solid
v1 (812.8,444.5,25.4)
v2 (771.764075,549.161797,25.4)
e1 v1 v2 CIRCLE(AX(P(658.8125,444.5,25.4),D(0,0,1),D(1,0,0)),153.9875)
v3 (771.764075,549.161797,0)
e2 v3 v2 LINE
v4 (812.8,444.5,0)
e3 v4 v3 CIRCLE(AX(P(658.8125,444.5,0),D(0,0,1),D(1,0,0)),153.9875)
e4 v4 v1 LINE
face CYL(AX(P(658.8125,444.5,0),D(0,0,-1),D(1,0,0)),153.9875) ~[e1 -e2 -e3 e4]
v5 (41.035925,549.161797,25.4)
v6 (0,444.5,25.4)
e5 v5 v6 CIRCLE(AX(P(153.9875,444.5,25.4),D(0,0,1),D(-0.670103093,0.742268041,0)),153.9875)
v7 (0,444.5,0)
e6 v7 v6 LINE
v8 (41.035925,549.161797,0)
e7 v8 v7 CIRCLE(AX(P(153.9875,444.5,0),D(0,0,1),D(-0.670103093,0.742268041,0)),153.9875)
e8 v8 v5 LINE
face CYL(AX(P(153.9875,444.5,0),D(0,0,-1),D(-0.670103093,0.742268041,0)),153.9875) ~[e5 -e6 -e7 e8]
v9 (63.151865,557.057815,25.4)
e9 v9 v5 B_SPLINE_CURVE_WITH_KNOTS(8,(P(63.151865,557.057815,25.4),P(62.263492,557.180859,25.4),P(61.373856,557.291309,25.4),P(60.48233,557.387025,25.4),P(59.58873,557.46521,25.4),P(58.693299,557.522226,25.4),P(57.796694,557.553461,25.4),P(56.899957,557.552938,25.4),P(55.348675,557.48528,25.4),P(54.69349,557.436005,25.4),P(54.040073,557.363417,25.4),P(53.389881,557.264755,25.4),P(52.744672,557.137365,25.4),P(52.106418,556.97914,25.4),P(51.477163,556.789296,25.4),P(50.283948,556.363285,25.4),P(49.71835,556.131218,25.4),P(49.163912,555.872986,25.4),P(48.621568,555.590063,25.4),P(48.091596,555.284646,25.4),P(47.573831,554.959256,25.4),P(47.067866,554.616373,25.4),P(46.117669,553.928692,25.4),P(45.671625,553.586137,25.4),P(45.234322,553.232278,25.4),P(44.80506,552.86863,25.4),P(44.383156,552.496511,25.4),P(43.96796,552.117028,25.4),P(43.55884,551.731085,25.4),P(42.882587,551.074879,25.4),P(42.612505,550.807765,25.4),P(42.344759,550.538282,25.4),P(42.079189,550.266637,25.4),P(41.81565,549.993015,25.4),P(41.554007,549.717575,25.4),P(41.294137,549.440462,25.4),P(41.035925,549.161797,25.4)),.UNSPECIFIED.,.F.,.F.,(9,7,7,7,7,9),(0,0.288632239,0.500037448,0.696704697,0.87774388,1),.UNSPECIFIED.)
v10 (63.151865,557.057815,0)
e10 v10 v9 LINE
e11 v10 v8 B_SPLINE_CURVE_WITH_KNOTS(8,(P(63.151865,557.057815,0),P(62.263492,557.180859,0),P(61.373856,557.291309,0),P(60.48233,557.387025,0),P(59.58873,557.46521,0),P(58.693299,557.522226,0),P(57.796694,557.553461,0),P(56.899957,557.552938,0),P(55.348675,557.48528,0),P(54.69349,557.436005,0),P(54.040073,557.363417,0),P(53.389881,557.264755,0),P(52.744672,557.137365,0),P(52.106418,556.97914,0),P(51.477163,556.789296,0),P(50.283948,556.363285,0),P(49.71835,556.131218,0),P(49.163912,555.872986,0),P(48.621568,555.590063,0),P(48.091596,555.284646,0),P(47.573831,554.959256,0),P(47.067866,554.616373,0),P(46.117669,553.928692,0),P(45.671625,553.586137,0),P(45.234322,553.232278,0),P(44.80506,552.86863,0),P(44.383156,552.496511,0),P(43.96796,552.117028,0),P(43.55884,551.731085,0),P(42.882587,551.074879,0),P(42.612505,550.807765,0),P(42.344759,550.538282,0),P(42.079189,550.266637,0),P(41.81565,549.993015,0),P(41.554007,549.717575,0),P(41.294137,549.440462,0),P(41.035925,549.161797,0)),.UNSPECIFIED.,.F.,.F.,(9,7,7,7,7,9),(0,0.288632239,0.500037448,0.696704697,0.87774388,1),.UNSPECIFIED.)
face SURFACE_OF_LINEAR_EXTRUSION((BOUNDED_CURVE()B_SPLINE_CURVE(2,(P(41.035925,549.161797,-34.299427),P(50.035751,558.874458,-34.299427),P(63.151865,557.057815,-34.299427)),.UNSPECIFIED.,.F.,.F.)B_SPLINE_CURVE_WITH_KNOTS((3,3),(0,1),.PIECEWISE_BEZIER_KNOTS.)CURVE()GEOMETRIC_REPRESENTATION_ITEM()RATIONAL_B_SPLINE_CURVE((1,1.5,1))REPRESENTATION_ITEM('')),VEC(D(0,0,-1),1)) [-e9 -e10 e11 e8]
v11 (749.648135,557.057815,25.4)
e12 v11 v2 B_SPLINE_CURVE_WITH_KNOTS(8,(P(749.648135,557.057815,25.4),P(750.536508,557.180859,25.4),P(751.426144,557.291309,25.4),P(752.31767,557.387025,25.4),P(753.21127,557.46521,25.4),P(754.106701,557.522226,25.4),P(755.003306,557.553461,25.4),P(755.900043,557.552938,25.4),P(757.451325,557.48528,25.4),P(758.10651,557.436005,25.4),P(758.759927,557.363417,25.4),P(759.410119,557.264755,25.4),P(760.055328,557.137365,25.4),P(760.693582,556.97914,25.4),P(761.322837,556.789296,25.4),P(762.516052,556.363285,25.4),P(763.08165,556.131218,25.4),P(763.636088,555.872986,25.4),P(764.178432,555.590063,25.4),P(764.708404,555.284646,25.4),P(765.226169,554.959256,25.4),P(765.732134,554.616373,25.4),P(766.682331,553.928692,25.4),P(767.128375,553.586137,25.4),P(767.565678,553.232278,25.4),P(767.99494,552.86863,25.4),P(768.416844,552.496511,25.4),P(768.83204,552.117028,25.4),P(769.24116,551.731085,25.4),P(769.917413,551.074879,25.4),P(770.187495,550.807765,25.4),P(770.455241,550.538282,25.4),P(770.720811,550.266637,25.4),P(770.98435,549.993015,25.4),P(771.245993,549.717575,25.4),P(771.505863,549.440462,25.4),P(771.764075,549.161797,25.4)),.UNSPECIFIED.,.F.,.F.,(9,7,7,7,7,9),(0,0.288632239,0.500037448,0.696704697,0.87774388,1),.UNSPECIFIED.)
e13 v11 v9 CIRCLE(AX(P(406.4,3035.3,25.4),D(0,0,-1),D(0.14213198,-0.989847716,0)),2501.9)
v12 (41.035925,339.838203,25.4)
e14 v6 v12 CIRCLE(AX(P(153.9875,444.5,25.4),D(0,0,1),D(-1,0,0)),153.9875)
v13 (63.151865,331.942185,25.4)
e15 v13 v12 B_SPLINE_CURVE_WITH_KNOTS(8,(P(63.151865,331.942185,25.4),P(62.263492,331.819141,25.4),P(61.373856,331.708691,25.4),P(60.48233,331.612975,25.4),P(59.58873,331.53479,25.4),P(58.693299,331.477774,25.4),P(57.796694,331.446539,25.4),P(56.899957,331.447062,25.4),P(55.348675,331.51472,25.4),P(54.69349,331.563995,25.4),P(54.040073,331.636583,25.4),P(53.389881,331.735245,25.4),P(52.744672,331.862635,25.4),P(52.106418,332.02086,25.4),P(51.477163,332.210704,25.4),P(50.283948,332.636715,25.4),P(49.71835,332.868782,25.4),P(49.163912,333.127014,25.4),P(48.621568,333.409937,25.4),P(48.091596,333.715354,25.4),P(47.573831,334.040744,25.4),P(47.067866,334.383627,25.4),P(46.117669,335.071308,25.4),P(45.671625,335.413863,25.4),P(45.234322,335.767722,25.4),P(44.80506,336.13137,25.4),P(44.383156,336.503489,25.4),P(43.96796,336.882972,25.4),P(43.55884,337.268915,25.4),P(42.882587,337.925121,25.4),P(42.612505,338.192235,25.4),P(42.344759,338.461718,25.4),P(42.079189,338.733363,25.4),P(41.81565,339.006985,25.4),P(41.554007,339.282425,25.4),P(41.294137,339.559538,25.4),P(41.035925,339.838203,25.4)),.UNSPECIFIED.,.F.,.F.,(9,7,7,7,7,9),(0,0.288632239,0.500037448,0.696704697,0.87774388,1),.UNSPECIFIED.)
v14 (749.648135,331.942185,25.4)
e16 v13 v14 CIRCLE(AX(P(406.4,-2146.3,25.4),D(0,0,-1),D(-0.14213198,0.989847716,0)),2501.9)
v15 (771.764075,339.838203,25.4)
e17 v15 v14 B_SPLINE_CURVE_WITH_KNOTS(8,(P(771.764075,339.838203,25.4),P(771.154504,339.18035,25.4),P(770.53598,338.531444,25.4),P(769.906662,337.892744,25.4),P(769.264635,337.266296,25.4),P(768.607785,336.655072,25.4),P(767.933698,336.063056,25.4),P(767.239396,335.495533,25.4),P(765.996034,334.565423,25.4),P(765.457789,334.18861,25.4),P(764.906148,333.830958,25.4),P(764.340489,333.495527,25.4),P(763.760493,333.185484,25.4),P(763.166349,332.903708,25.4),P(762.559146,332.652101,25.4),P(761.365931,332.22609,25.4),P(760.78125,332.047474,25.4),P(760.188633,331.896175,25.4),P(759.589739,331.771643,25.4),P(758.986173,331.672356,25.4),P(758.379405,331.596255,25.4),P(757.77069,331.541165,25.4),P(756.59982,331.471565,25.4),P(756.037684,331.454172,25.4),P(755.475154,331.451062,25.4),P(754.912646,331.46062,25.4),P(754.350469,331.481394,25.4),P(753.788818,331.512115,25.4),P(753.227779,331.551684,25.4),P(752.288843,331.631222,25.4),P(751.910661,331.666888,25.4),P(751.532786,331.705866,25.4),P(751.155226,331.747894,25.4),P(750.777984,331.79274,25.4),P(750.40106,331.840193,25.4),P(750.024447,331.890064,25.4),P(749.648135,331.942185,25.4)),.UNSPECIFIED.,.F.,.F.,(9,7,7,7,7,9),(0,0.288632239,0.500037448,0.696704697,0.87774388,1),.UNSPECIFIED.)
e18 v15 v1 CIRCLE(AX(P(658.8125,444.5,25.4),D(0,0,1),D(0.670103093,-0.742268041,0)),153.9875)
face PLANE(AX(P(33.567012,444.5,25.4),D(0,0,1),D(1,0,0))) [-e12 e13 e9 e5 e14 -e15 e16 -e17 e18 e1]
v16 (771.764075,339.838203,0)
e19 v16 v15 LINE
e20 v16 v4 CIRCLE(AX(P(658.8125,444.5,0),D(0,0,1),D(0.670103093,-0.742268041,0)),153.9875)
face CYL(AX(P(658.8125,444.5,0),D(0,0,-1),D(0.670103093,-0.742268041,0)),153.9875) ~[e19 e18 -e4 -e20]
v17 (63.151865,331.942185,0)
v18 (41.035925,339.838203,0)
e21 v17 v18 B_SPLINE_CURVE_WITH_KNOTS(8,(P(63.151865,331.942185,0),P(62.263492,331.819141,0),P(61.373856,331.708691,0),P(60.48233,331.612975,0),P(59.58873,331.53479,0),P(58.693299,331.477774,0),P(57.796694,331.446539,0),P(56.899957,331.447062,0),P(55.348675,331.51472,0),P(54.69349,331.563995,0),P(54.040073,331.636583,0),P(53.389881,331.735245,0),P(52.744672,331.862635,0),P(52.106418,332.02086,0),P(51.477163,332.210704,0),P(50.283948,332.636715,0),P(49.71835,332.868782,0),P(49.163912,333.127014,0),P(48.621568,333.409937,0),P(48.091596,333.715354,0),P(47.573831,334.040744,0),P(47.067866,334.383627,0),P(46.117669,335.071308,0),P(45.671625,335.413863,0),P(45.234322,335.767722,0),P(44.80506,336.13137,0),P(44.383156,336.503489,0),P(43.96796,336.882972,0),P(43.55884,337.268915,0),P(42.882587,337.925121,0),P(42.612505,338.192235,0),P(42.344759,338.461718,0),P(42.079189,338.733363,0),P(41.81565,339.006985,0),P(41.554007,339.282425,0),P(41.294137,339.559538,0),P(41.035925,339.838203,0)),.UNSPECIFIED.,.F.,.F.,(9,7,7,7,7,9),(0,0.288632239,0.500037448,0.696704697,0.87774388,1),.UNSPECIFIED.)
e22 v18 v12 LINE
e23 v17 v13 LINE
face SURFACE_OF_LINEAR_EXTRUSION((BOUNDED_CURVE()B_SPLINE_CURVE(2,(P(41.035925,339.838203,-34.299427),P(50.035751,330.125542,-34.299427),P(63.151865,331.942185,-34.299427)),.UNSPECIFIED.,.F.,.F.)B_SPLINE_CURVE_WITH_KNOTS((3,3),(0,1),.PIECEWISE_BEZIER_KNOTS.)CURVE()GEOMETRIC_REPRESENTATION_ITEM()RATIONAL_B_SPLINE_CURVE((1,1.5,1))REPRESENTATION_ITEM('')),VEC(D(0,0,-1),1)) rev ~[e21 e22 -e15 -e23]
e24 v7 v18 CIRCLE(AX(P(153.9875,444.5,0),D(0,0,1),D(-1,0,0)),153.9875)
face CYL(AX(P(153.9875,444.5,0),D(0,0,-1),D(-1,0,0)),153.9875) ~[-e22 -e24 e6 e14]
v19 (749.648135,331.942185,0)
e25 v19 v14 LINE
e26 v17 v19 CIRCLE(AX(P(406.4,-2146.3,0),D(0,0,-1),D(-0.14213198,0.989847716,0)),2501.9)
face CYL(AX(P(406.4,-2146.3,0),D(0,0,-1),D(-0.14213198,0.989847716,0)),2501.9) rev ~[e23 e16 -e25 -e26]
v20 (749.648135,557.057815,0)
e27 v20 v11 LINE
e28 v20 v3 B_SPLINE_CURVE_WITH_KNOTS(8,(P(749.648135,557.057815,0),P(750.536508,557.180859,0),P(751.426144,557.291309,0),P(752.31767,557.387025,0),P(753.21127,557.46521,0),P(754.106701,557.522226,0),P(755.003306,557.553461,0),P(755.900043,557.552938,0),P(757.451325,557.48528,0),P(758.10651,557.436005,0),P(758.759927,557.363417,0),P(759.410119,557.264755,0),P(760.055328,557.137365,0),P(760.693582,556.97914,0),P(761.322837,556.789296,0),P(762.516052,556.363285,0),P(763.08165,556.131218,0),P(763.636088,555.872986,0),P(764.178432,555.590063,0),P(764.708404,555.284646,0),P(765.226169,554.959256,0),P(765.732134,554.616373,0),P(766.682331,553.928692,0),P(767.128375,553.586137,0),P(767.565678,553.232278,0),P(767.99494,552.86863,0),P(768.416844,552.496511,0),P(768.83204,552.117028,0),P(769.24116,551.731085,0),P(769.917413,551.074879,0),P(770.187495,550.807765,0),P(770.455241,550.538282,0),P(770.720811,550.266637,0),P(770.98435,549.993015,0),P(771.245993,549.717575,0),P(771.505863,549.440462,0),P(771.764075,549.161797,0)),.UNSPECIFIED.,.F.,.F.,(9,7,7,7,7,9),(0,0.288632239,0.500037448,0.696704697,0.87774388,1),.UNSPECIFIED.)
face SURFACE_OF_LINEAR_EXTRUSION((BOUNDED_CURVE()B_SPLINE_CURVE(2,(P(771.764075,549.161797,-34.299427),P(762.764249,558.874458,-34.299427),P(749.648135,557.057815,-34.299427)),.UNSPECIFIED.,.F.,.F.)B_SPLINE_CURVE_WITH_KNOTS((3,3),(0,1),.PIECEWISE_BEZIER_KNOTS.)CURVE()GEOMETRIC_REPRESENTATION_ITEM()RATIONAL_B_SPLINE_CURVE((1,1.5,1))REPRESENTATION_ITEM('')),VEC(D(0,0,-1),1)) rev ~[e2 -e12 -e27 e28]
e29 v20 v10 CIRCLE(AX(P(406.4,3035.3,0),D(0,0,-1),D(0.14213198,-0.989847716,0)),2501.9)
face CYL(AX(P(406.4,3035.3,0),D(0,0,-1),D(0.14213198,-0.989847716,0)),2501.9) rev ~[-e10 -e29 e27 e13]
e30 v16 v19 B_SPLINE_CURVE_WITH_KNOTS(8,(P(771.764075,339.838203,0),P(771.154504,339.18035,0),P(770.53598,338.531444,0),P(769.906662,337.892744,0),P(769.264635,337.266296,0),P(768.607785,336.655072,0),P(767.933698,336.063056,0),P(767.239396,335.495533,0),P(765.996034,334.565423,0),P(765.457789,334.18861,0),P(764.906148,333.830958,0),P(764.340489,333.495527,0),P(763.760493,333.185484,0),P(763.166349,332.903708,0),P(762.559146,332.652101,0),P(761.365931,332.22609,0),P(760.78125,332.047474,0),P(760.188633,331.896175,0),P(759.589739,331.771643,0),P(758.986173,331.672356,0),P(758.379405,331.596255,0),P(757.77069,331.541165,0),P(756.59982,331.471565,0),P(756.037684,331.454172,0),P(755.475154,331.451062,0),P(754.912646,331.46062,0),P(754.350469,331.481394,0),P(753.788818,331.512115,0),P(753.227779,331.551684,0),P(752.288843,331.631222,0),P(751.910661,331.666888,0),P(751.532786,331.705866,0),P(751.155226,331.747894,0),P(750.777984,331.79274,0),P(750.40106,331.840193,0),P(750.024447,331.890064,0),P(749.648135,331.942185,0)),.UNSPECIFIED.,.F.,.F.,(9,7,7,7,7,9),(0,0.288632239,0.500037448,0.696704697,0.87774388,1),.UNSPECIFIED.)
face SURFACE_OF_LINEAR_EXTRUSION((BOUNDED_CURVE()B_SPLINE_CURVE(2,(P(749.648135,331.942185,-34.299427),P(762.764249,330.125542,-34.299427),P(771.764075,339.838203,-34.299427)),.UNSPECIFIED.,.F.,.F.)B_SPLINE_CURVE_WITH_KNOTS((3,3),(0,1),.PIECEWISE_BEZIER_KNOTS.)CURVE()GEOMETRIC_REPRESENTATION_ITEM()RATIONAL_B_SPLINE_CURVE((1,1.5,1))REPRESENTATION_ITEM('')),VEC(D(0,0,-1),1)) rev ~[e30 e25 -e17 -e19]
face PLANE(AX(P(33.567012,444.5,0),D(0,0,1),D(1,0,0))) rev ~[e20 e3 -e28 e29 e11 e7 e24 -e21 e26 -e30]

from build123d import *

# Parameters (mm, degrees)
F1_DEPTH    = 25.4
F2_T1_DEPTH = 93.9988541888


# Not quite as in the source:
# - a fillet or chamfer that OpenCascade refuses, or shapes differently, is made with other operations: its cross-section is extruded or revolved along the edge and cut away or added


with BuildPart() as f1:
    # F0 (on Top) → F1 (new body)
    with BuildSketch(Plane.XY):
        with BuildLine():
            ThreePointArc((50.8, 558.8), (13.2719441568, 507.0402470414), (0, 444.5))
            ThreePointArc((0, 444.5), (13.2719441568, 381.9597529586), (50.8, 330.2))
            Line((50.8, 330.2), (50.8, 558.8))
        make_face()
        with BuildLine():
            ThreePointArc((277.2968022896, 536.7332159534), (163.7973759268, 545.1900472484), (50.8, 558.8))
            Line((50.8, 558.8), (50.8, 330.2))
            ThreePointArc((50.8, 330.2), (163.7973759268, 343.8099527516), (277.2968022896, 352.2667840466))
            ThreePointArc((277.2968022896, 352.2667840466), (300.1043048901, 395.8992851393), (307.975, 444.5))
            ThreePointArc((307.975, 444.5), (300.1043048901, 493.1007148607), (277.2968022896, 536.7332159534))
        make_face()
        with BuildLine():
            Line((762, 330.2), (762, 558.8))
            ThreePointArc((762, 558.8), (649.0026240732, 545.1900472484), (535.5031977104, 536.7332159534))
            ThreePointArc((535.5031977104, 536.7332159534), (504.825, 444.5), (535.5031977104, 352.2667840466))
            ThreePointArc((535.5031977104, 352.2667840466), (649.0026240732, 343.8099527516), (762, 330.2))
        make_face()
        with BuildLine():
            ThreePointArc((812.8, 444.5), (799.5280558432, 507.0402470414), (762, 558.8))
            Line((762, 558.8), (762, 330.2))
            ThreePointArc((762, 330.2), (799.5280558432, 381.9597529586), (812.8, 444.5))
        make_face()
        with BuildLine():
            ThreePointArc((535.5031977104, 536.7332159534), (406.4, 533.4), (277.2968022896, 536.7332159534))
            ThreePointArc((277.2968022896, 536.7332159534), (300.1043048901, 493.1007148607), (307.975, 444.5))
            ThreePointArc((307.975, 444.5), (300.1043048901, 395.8992851393), (277.2968022896, 352.2667840466))
            ThreePointArc((277.2968022896, 352.2667840466), (406.4, 355.6), (535.5031977104, 352.2667840466))
            ThreePointArc((535.5031977104, 352.2667840466), (504.825, 444.5), (535.5031977104, 536.7332159534))
        make_face()
    extrude(amount=F1_DEPTH)

    # F2: fillet of radius 25.4 on 4 edges, made by hand

    # F2_s2 → F2_t1 (cut)
    with BuildSketch(Plane.XY.offset(-34.2994270944)):
        with BuildLine():
            add(Edge.make_bspline(
                [(771.7640751065, 549.1617974106), (762.7642490879, 558.8744580913), (749.6481348223, 557.0578149138)],
                knots=[0, 0, 0, 1, 1, 1], degree=2, weights=[1, 1.5, 1]))
            ThreePointArc((749.6481348223, 557.0578149138), (755.8251531993, 557.9212093603), (762, 558.8))
            ThreePointArc((762, 558.8), (766.9894323112, 554.0896960119), (771.7640751065, 549.1617974106))
        make_face()
        with BuildLine():
            add(Edge.make_bspline(
                [(41.0359248935, 549.1617974105), (50.0357509121, 558.8744580913), (63.1518651777, 557.0578149137)],
                knots=[0, 0, 0, 1, 1, 1], degree=2, weights=[1, 1.5, 1]))
            ThreePointArc((63.1518651777, 557.0578149137), (56.9748468007, 557.9212093602), (50.8, 558.8))
            ThreePointArc((50.8, 558.8), (45.8105676888, 554.0896960119), (41.0359248935, 549.1617974105))
        make_face()
        with BuildLine():
            add(Edge.make_bspline(
                [(41.0359248935, 339.8382025894), (50.0357509121, 330.1255419087), (63.1518651777, 331.9421850862)],
                knots=[0, 0, 0, 1, 1, 1], degree=2, weights=[1, 1.5, 1]))
            ThreePointArc((63.1518651777, 331.9421850862), (56.9748468007, 331.0787906397), (50.8, 330.2))
            ThreePointArc((50.8, 330.2), (45.8105676888, 334.9103039881), (41.0359248935, 339.8382025894))
        make_face()
        with BuildLine():
            add(Edge.make_bspline(
                [(749.6481348223, 331.9421850862), (762.7642490879, 330.1255419087), (771.7640751065, 339.8382025894)],
                knots=[0, 0, 0, 1, 1, 1], degree=2, weights=[1, 1.5, 1]))
            ThreePointArc((771.7640751065, 339.8382025894), (766.9894323112, 334.9103039881), (762, 330.2))
            ThreePointArc((762, 330.2), (755.8251531993, 331.0787906397), (749.6481348223, 331.9421850862))
        make_face()
    extrude(amount=F2_T1_DEPTH, mode=Mode.SUBTRACT)


solid = f1.part
